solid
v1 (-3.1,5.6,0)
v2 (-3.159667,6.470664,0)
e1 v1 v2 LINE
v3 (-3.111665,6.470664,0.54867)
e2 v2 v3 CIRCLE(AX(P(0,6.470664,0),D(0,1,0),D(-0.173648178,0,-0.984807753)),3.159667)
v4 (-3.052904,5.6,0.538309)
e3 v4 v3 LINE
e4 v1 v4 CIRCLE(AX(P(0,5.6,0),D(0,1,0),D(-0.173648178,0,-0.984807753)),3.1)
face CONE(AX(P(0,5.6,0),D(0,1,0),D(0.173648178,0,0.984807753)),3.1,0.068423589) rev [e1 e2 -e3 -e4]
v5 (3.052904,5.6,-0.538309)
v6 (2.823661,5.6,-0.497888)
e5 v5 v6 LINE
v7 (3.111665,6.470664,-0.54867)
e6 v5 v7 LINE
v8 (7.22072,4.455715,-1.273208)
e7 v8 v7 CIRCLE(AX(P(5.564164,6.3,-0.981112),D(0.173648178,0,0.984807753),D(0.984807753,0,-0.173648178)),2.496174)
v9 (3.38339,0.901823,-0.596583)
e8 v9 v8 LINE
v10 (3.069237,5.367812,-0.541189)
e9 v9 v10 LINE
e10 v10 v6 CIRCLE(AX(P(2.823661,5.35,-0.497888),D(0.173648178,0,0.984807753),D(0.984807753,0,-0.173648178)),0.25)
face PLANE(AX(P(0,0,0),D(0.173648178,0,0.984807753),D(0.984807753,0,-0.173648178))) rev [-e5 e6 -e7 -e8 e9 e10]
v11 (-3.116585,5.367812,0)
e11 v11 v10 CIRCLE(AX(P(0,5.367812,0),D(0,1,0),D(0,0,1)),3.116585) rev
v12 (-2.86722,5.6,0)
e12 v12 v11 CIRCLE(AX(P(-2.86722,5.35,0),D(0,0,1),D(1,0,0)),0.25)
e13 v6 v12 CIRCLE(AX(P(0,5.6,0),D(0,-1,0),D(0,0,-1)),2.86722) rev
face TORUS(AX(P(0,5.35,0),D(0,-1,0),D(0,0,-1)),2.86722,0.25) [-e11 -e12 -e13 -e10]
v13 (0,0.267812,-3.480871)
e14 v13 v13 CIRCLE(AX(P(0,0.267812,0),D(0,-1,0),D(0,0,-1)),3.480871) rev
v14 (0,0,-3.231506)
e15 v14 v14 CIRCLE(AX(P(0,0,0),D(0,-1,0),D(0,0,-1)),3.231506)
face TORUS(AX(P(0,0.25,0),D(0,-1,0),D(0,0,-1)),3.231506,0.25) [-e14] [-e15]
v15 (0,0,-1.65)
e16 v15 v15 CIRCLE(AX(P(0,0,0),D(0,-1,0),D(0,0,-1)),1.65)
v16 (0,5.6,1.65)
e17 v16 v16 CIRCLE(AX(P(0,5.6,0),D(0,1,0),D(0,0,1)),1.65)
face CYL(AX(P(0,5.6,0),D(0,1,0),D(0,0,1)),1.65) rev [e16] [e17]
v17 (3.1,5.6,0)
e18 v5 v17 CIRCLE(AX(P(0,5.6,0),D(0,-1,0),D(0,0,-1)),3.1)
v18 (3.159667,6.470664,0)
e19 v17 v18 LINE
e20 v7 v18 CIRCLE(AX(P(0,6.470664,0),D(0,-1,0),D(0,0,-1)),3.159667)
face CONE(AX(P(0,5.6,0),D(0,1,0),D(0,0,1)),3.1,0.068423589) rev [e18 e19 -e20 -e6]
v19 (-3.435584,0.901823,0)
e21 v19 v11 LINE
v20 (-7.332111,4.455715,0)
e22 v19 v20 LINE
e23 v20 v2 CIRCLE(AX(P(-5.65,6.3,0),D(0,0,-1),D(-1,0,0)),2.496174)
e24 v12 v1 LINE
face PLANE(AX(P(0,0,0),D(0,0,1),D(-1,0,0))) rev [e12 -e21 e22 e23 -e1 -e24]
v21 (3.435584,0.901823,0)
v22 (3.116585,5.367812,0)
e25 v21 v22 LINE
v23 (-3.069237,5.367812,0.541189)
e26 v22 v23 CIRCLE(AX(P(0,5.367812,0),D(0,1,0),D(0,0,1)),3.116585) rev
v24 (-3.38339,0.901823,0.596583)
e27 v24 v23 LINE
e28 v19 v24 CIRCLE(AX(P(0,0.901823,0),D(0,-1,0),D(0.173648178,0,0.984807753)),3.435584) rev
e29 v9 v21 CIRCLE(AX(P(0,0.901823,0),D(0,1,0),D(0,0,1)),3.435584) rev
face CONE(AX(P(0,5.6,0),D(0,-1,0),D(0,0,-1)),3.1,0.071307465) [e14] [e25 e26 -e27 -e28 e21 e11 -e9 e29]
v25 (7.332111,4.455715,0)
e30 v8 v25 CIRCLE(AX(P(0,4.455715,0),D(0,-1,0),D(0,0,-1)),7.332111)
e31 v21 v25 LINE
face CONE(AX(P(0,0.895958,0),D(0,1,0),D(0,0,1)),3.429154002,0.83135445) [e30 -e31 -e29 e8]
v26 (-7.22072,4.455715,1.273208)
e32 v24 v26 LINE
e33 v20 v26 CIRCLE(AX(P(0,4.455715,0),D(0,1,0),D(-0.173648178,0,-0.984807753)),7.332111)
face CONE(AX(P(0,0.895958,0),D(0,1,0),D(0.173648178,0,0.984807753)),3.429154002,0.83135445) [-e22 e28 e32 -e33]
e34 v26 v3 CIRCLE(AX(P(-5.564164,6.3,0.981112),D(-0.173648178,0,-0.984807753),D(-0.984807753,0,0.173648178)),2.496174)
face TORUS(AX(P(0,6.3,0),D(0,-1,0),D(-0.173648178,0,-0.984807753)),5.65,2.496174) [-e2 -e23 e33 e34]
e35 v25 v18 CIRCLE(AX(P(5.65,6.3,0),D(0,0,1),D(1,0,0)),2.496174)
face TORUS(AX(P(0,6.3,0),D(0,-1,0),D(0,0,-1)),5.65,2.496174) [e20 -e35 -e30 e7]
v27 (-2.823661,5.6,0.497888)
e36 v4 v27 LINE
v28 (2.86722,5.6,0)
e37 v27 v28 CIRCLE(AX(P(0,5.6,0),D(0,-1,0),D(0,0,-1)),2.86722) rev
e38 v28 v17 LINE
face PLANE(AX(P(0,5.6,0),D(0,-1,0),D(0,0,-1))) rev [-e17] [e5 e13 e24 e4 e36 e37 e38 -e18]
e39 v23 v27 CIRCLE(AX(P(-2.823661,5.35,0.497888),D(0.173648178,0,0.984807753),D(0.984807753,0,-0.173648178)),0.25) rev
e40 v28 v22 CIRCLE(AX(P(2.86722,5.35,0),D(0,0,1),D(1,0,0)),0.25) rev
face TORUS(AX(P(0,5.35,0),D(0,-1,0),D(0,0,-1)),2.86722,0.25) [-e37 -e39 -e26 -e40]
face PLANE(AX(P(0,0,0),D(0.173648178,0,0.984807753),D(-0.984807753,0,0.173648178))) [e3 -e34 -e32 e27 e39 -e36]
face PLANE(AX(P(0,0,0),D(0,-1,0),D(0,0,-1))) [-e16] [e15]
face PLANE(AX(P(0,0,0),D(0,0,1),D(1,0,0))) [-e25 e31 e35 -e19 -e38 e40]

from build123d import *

# Parameters (mm, degrees)
REVOLU_O3_ANGLE                             = 10
CORTE_EXTRUS_O2_DEPTH                       = 10
BROCA_DE_ROSQUEAR_PARA_TARRAXA_DE_M41_D     = 3.3
BROCA_DE_ROSQUEAR_PARA_TARRAXA_DE_M41_DEPTH = 10
BROCA_DE_ROSQUEAR_PARA_TARRAXA_DE_M41_TIP   = 0.991420021
FILETE1_R                                   = 0.25


with BuildPart() as part:
    # Esboço1 → Revolução2 (revolve)
    with BuildSketch(Plane.XY, mode=Mode.PRIVATE) as revolu_o2_sk:
        Polygon((3.1, 5.6), (3.5, 0), (0, 0), (0, 5.6), align=None)
    revolve(revolu_o2_sk.sketch.rotate(Axis((0, 0, 0), (0, 1, 0)), 90), axis=Axis((0, 0, 0), (0, 1, 0)))

    # Esboço3 → Revolução3 (revolve)
    with BuildSketch(Plane.XY):
        with BuildLine():
            Line((3.1, 5.6), (3.159667096, 6.470663935))
            ThreePointArc((3.159667096, 6.470663935), (6.735500159, 8.547793041), (7.332110812, 4.455714945))
            Line((7.332110812, 4.455714945), (3.429154002, 0.895958371))
            Line((3.429154002, 0.895958371), (3.1, 5.6))
        make_face()
    revolve(axis=Axis((0, 0, 0), (0, 1, 0)), revolution_arc=REVOLU_O3_ANGLE)

    # Esboço4 → Corte-extrusão2 (cut)
    with BuildSketch(Plane(origin=(0, 5.6, 0), x_dir=(1, 0, 0), z_dir=(0, 1, 0))):
        with BuildLine():
            Line((0.270182803, -3.088203564), (0, 0))
            Line((0, 0), (-0.270182803, 3.088203564))
            ThreePointArc((-0.270182803, 3.088203564), (-3.088203564, -0.270182803), (0.270182803, -3.088203564))
        make_face()
        with BuildLine():
            Line((0.342968893, -3.920152382), (0.270182803, -3.088203564))
            ThreePointArc((0.270182803, -3.088203564), (-3.088203564, -0.270182803), (-0.270182803, 3.088203564))
            Line((-0.270182803, 3.088203564), (-0.342968893, 3.920152382))
            ThreePointArc((-0.342968893, 3.920152382), (-3.920152382, -0.342968893), (0.342968893, -3.920152382))
        make_face()
    extrude(amount=-CORTE_EXTRUS_O2_DEPTH, mode=Mode.SUBTRACT)

    # Espelhar1: part across face


with BuildPart() as part_1:
    add(part.part)
    add(part.part.mirror(Plane(origin=(0, 2.743434343, 0), x_dir=(0.08715574300604889, 0, 0.9961946980691392), z_dir=(-0.9961946980691393, 0, 0.08715574300604889))))

    # Broca de rosquear para tarraxa de M41
    with Locations(Plane(origin=(0, 5.6, 0), x_dir=(1, 0, 0), z_dir=(0, 1, 0))):
        with Locations((0, 0)):
            Hole(BROCA_DE_ROSQUEAR_PARA_TARRAXA_DE_M41_D / 2, depth=BROCA_DE_ROSQUEAR_PARA_TARRAXA_DE_M41_DEPTH)
            with Locations((0, 0, -(BROCA_DE_ROSQUEAR_PARA_TARRAXA_DE_M41_DEPTH + BROCA_DE_ROSQUEAR_PARA_TARRAXA_DE_M41_TIP / 2))):  # 118° drill point
                Cone(0, BROCA_DE_ROSQUEAR_PARA_TARRAXA_DE_M41_D / 2, BROCA_DE_ROSQUEAR_PARA_TARRAXA_DE_M41_TIP, mode=Mode.SUBTRACT)

    # Filete1
    # the kernel refuses this fillet: 0.25 mm, written as the material it takes off along each edge
    with BuildSketch(Plane(origin=(0, 5.6, 0), x_dir=(0.08715574274766005, 0, 0.9961946980917454), z_dir=(-0.9961946980917454, 0, 0.08715574274766005))) as filete1_piece_1:
        with BuildLine():
            CenterArc((3.1 - FILETE1_R * 0.931119203401, -FILETE1_R), FILETE1_R, 4.08561678, 85.91438322)
            Line((3.1 - FILETE1_R * 0.931119203401, 0), (3.1, 0))
            Line((3.1, 0), (3.1 + FILETE1_R * 0.0663394964294, -FILETE1_R * 0.928752950012))
        make_face()
    revolve(axis=Axis((0, 5.6, 0), (0, 1, 0)), revolution_arc=85, mode=Mode.SUBTRACT)
    with BuildSketch(Plane(origin=(0, 5.6, 0), x_dir=(0.08715574274766005, 0, 0.9961946980917454), z_dir=(-0.9961946980917454, 0, 0.08715574274766005))) as filete1_piece_2_section:
        with BuildLine():
            CenterArc((3.1 - FILETE1_R * 0.931119203401, -FILETE1_R), FILETE1_R, 4.08561678, 85.91438322)
            Line((3.1 - FILETE1_R * 0.931119203401, 0), (3.1, 0))
            Line((3.1, 0), (3.1 + FILETE1_R * 0.0663394964294, -FILETE1_R * 0.928752950012))
        make_face()
    filete1_piece_2 = revolve(axis=Axis((0, 5.6, 0), (0, 1, 0)), revolution_arc=95.759741079, mode=Mode.PRIVATE)
    filete1_piece_2 = split(filete1_piece_2, bisect_by=Plane(origin=(3.054670317, 5.486797578, -0.538620794), z_dir=(-0.17364817766693072, 0, -0.984807753012208)), keep=Keep.TOP, mode=Mode.PRIVATE)
    add(filete1_piece_2, mode=Mode.SUBTRACT)
    with BuildSketch(Plane(origin=(0, 0, 0), x_dir=(0.08715574274766182, 0, 0.9961946980917452), z_dir=(-0.9961946980917452, 0, 0.08715574274766182))) as filete1_piece_3:
        with BuildLine():
            CenterArc((3.5 - FILETE1_R * 1.07397634626, FILETE1_R), FILETE1_R, 270, 94.08561678)
            Line((3.5 - FILETE1_R * 1.07397634626, 0), (3.5, 0))
            Line((3.5, 0), (3.5 - FILETE1_R * 0.0765176464277, FILETE1_R * 1.07124704999))
        make_face()
    revolve(axis=Axis((0, 0, 0), (0, 1, 0)), revolution_arc=180, mode=Mode.SUBTRACT)
    with BuildSketch(Plane(origin=(0, 5.6, 0), x_dir=(-0.08715574274762866, 0, -0.9961946980917481), z_dir=(-0.9961946980917481, 0, 0.08715574274762866))) as filete1_piece_4:
        with BuildLine():
            CenterArc((3.1 - FILETE1_R * 0.931119203401, FILETE1_R), FILETE1_R, 270, 85.91438322)
            Line((3.1 - FILETE1_R * 0.931119203401, 0), (3.1, 0))
            Line((3.1, 0), (3.1 + FILETE1_R * 0.0663394964294, FILETE1_R * 0.928752950012))
        make_face()
    revolve(axis=Axis((0, 5.6, 0), (0, -1, 0)), revolution_arc=85, mode=Mode.SUBTRACT)
    with BuildSketch(Plane(origin=(0, 5.6, 0), x_dir=(-0.08715574274762866, 0, -0.9961946980917481), z_dir=(-0.9961946980917481, 0, 0.08715574274762866))) as filete1_piece_5_section:
        with BuildLine():
            CenterArc((3.1 - FILETE1_R * 0.931119203401, FILETE1_R), FILETE1_R, 270, 85.91438322)
            Line((3.1 - FILETE1_R * 0.931119203401, 0), (3.1, 0))
            Line((3.1, 0), (3.1 + FILETE1_R * 0.0663394964294, FILETE1_R * 0.928752950012))
        make_face()
    filete1_piece_5 = revolve(axis=Axis((0, 5.6, 0), (0, -1, 0)), revolution_arc=95.759741079, mode=Mode.PRIVATE)
    filete1_piece_5 = split(filete1_piece_5, bisect_by=Plane(origin=(3.10179353, 5.486797578, 0), z_dir=(0, 0, 1)), keep=Keep.TOP, mode=Mode.PRIVATE)
    add(filete1_piece_5, mode=Mode.SUBTRACT)
    with BuildSketch(Plane(origin=(0, 5.6, 0), x_dir=(-0.08715574326446912, 0, -0.9961946980465305), z_dir=(0.9961946980465305, 0, -0.08715574326446912))) as filete1_piece_6:
        with BuildLine():
            CenterArc((3.1 - FILETE1_R * 0.931119203401, -FILETE1_R), FILETE1_R, 4.08561678, 85.91438322)
            Line((3.1 + FILETE1_R * 0.0663394964294, -FILETE1_R * 0.928752950012), (3.1, 0))
            Line((3.1, 0), (3.1 - FILETE1_R * 0.931119203401, 0))
        make_face()
    revolve(axis=Axis((0, 5.6, 0), (0, 1, 0)), revolution_arc=85, mode=Mode.SUBTRACT)
    with BuildSketch(Plane(origin=(0, 5.6, 0), x_dir=(-0.08715574326446912, 0, -0.9961946980465305), z_dir=(0.9961946980465305, 0, -0.08715574326446912))) as filete1_piece_7_section:
        with BuildLine():
            CenterArc((3.1 - FILETE1_R * 0.931119203401, -FILETE1_R), FILETE1_R, 4.08561678, 85.91438322)
            Line((3.1 + FILETE1_R * 0.0663394964294, -FILETE1_R * 0.928752950012), (3.1, 0))
            Line((3.1, 0), (3.1 - FILETE1_R * 0.931119203401, 0))
        make_face()
    filete1_piece_7 = revolve(axis=Axis((0, 5.6, 0), (0, 1, 0)), revolution_arc=95.759741079, mode=Mode.PRIVATE)
    filete1_piece_7 = split(filete1_piece_7, bisect_by=Plane(origin=(-2.996372834, 5.561029125, 0.528341377), z_dir=(0.17364817817780473, 0, 0.9848077529221271)), keep=Keep.TOP, mode=Mode.PRIVATE)
    add(filete1_piece_7, mode=Mode.SUBTRACT)
    with BuildSketch(Plane(origin=(0, 0, 0), x_dir=(0.08715574326443595, 0, 0.9961946980465334), z_dir=(0.9961946980465334, 0, -0.08715574326443595))) as filete1_piece_8:
        with BuildLine():
            CenterArc((3.5 - FILETE1_R * 1.07397634626, -FILETE1_R), FILETE1_R, 355.91438322, 94.08561678)
            Line((3.5 - FILETE1_R * 1.07397634626, 0), (3.5, 0))
            Line((3.5, 0), (3.5 - FILETE1_R * 0.0765176464277, -FILETE1_R * 1.07124704999))
        make_face()
    revolve(axis=Axis((0, 0, 0), (0, -1, 0)), revolution_arc=180, mode=Mode.SUBTRACT)
    with BuildSketch(Plane(origin=(0, 5.6, 0), x_dir=(0.08715574326443776, 0, 0.996194698046533), z_dir=(0.996194698046533, 0, -0.08715574326443776))) as filete1_piece_9:
        with BuildLine():
            CenterArc((3.1 - FILETE1_R * 0.931119203401, FILETE1_R), FILETE1_R, 270, 85.91438322)
            Line((3.1 + FILETE1_R * 0.0663394964294, FILETE1_R * 0.928752950012), (3.1, 0))
            Line((3.1, 0), (3.1 - FILETE1_R * 0.931119203401, 0))
        make_face()
    revolve(axis=Axis((0, 5.6, 0), (0, -1, 0)), revolution_arc=85, mode=Mode.SUBTRACT)
    with BuildSketch(Plane(origin=(0, 5.6, 0), x_dir=(0.08715574326443776, 0, 0.996194698046533), z_dir=(0.996194698046533, 0, -0.08715574326443776))) as filete1_piece_10_section:
        with BuildLine():
            CenterArc((3.1 - FILETE1_R * 0.931119203401, FILETE1_R), FILETE1_R, 270, 85.91438322)
            Line((3.1 + FILETE1_R * 0.0663394964294, FILETE1_R * 0.928752950012), (3.1, 0))
            Line((3.1, 0), (3.1 - FILETE1_R * 0.931119203401, 0))
        make_face()
    filete1_piece_10 = revolve(axis=Axis((0, 5.6, 0), (0, -1, 0)), revolution_arc=95.759741079, mode=Mode.PRIVATE)
    filete1_piece_10 = split(filete1_piece_10, bisect_by=Plane(origin=(-3.042596715, 5.561029125, 2e-09), z_dir=(-5.187550944363294e-10, 0, -1.0)), keep=Keep.TOP, mode=Mode.PRIVATE)
    add(filete1_piece_10, mode=Mode.SUBTRACT)


solid = part_1.part
